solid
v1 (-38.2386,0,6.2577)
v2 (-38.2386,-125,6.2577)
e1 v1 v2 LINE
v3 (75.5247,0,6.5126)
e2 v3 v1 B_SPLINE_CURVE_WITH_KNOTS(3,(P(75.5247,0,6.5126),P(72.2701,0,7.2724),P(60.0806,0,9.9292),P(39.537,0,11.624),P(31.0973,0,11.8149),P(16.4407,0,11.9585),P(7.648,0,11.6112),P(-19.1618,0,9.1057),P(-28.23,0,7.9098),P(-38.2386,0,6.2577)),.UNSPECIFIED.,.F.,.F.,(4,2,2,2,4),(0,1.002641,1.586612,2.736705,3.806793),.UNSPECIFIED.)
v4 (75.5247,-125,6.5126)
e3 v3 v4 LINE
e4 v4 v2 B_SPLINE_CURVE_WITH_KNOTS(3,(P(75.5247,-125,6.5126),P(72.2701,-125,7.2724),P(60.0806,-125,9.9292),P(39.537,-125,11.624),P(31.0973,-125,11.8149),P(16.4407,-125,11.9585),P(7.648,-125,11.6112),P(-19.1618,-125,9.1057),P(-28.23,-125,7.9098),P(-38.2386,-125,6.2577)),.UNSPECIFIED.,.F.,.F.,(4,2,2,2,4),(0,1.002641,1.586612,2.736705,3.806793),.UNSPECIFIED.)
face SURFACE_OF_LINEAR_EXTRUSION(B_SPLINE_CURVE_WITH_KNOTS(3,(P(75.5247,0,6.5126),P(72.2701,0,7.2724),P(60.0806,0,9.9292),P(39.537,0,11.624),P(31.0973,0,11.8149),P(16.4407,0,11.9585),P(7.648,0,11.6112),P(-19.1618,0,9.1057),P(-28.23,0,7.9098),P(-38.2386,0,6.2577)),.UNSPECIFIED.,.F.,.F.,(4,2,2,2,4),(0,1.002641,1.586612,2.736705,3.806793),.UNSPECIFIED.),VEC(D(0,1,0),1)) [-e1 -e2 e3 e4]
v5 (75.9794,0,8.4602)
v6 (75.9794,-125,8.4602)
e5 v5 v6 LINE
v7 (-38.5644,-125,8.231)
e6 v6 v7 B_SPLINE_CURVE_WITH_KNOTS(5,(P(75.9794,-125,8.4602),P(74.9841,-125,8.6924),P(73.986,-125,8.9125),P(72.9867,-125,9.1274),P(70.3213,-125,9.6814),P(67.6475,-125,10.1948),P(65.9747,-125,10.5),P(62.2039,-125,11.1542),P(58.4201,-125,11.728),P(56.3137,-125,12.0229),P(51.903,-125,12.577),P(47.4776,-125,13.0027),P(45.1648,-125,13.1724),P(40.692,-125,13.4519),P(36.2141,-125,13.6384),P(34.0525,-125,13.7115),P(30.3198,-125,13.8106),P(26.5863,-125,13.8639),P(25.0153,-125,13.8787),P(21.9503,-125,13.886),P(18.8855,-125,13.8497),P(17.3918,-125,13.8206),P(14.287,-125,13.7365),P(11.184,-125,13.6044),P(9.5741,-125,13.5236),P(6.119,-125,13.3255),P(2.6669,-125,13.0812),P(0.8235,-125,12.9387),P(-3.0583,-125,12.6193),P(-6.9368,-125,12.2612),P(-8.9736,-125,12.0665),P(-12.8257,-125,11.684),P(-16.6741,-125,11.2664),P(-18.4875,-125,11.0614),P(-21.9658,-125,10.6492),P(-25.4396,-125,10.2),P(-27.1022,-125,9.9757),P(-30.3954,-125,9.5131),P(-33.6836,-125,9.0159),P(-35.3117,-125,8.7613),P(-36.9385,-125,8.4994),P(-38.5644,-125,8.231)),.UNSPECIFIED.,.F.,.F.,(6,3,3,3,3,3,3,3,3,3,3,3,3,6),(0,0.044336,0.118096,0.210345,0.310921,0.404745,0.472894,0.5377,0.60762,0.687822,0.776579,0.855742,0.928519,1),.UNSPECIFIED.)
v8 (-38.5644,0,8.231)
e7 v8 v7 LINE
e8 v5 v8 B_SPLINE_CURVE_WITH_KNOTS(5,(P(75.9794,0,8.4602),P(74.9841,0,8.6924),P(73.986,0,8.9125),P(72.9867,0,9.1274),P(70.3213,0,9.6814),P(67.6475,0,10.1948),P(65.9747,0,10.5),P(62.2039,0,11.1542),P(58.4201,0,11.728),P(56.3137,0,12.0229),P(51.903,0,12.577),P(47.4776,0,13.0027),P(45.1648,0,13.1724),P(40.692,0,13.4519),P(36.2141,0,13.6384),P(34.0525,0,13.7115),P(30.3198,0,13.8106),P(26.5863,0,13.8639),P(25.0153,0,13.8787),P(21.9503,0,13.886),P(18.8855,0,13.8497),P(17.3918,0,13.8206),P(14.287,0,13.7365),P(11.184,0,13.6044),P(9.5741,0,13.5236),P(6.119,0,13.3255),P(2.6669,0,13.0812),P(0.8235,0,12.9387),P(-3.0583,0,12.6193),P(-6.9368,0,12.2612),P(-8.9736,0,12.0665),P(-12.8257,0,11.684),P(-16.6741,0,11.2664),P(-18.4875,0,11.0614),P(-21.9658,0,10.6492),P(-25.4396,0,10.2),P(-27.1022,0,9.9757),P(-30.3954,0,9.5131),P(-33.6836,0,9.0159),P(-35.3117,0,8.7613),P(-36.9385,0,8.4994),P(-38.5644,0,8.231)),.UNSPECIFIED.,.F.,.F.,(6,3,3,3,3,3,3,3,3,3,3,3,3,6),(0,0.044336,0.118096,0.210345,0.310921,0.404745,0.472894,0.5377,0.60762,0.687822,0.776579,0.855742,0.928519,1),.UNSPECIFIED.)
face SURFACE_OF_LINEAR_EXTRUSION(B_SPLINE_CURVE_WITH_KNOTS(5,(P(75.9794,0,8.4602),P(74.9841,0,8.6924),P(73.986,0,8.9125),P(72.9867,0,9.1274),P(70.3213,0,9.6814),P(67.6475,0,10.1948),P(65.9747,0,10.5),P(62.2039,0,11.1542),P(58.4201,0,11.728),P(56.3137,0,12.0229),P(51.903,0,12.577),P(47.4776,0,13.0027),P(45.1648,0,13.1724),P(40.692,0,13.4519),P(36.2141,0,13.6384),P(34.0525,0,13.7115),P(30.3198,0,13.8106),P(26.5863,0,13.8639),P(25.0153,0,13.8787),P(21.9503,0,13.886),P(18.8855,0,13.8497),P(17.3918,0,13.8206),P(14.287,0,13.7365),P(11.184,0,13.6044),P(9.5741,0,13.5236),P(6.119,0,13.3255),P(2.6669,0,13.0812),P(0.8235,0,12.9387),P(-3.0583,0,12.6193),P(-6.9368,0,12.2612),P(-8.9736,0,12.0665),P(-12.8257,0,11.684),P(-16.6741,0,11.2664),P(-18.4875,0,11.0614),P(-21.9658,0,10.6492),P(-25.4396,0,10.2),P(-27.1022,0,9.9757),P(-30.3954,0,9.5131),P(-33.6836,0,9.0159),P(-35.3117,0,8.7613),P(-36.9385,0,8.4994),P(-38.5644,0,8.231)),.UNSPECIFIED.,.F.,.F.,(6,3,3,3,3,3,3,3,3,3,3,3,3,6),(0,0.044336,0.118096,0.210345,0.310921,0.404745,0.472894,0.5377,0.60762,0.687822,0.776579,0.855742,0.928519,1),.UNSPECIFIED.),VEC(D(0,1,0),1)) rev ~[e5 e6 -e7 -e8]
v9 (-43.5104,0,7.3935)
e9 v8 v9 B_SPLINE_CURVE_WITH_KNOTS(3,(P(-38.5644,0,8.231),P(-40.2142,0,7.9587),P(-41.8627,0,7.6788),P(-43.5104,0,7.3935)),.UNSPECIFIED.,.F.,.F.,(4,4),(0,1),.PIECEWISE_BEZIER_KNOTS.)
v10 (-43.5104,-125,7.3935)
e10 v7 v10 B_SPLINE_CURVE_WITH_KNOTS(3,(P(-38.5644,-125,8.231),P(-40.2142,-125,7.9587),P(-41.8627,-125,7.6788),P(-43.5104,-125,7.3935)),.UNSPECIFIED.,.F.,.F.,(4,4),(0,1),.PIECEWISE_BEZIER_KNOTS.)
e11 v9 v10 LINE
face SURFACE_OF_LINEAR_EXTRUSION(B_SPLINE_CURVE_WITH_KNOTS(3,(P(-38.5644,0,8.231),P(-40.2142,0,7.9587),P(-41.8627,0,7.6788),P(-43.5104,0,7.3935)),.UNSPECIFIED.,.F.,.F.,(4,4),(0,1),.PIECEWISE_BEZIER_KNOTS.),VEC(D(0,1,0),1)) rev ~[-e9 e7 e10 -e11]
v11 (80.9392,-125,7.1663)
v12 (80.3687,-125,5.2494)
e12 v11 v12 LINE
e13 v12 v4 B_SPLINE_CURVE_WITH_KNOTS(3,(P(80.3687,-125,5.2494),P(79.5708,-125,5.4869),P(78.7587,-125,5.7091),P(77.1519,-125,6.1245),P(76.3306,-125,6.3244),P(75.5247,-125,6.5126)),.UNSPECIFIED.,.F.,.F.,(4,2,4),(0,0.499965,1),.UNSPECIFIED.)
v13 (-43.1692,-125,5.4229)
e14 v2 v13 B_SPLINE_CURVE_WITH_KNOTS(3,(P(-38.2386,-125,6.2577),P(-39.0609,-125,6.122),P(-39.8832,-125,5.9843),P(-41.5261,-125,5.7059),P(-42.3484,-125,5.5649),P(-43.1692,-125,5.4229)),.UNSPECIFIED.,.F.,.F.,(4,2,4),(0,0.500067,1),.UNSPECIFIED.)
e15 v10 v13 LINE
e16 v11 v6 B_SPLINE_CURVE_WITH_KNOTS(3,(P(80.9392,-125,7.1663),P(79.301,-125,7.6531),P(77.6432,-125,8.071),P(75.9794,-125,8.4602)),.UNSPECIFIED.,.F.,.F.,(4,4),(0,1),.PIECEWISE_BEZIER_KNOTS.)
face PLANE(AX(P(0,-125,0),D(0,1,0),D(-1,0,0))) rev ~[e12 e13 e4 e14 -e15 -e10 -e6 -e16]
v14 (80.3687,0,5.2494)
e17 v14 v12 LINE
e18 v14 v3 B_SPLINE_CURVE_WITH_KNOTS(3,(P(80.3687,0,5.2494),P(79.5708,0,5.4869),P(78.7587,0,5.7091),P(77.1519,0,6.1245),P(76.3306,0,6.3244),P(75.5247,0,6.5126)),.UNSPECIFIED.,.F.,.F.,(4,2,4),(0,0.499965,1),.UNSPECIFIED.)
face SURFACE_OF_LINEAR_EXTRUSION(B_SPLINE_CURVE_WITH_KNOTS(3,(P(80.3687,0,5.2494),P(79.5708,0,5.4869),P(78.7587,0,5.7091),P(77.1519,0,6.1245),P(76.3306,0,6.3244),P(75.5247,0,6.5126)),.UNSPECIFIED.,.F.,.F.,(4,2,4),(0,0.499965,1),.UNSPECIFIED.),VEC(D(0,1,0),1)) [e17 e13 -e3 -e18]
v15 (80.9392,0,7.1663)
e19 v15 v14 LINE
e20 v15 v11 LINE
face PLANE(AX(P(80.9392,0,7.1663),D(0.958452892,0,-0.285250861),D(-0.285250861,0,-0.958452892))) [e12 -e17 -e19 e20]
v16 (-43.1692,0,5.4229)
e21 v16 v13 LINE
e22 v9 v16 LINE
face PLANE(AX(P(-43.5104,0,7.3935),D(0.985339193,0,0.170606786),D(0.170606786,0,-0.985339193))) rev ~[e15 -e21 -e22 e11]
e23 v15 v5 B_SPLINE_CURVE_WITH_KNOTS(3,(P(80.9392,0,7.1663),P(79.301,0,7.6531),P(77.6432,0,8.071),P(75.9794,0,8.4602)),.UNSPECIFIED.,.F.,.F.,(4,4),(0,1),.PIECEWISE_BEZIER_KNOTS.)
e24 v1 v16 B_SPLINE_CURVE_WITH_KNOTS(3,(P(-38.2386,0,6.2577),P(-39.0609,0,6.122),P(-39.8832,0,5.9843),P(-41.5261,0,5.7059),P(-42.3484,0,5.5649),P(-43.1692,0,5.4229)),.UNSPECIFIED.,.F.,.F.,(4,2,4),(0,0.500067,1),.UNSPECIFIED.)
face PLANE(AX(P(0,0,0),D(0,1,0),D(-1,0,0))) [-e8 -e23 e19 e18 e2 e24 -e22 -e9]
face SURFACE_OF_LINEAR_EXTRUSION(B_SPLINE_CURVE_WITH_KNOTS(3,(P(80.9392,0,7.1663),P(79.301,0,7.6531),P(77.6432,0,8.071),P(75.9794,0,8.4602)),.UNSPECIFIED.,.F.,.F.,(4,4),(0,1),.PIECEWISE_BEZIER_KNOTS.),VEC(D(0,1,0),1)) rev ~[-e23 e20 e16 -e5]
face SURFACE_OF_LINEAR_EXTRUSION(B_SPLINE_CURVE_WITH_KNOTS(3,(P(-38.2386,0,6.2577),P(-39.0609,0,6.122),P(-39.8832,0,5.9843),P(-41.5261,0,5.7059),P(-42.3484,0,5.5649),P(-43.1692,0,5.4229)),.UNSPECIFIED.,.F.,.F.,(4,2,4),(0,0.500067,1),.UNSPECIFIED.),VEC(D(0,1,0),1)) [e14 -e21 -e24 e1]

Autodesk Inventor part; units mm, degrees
ref_plane "YZ Plane" through (0, 0, 0) normal (1, 0, 0) x (0, 1, 0)
ref_plane "XZ Plane" through (0, 0, 0) normal (0, 1, 0) x (-1, 0, 0)
ref_plane "XY Plane" through (0, 0, 0) normal (0, 0, 1) x (1, 0, 0)
sketch "Sketch1" plane through (0, 0, 0) normal (0, 1, 0) x (-1, 0, 0)
  spline S0 degree 3 poles (43.1522, 5.3243) (42.3315, 5.4664) (41.5093, 5.6073) (39.8666, 5.8857) (39.0444, 6.0233) (38.2223, 6.159) knots 0 0 0 0 0.499933 0.499933 1 1 1 1
  spline S1 degree 3 poles (66.2259, 1.043) (62.6029, 1.7785) (58.6834, 2.5166) (51.798, 3.7917) (47.2188, 4.6203) (43.1522, 5.3243) knots 0 0 0 0 1.10907 1.10907 2.509245 2.509245 2.509245 2.509245
  spline S2 degree 3 poles (71.1391, 0.018) (70.321, 0.1929) (69.5028, 0.3659) (67.8628, 0.7083) (67.0477, 0.8762) (66.2259, 1.043) knots 0 0 0 0 0.250983 0.250983 0.502621 0.502621 0.502621 0.502621
  spline S3 degree 3 poles (100.0196, -7.1406) (100.0208, -7.1354) (100.0209, -7.13) (100.019, -7.1179) (100.0165, -7.1114) (100.0075, -7.0943) (99.9988, -7.0838) (99.9675, -7.0518) (99.9354, -7.0292) (99.7974, -6.9442) (99.6273, -6.8698) (98.578, -6.4707) (96.8058, -5.9602) (87.4188, -3.5895) (77.8842, -1.4241) (71.1391, 0.018) knots 0 0 0 0 0.003623 0.003623 0.008208 0.008208 0.01664 0.01664 0.03832 0.03832 0.1102 0.1102 0.407101 0.407101 1 1 1 1
  spline S4 degree 3 poles (88.3221, -6.0834) (91.7402, -6.4934) (94.4085, -6.8236) (97.4322, -7.1281) (98.4156, -7.2175) (99.3319, -7.2475) (99.5896, -7.2498) (99.8412, -7.2231) (99.9048, -7.2123) (99.9684, -7.1892) (99.9857, -7.1811) (100.0039, -7.1666) (100.0088, -7.1618) (100.0159, -7.1515) (100.0184, -7.1463) (100.0196, -7.1406) knots 0 0 0 0 1.032775 1.032775 1.426182 1.426182 1.558102 1.558102 1.606872 1.606872 1.625804 1.625804 1.633391 1.633391 1.640028 1.640028 1.640028 1.640028
  spline S5 degree 3 poles (83.37, -5.5037) (84.1975, -5.5971) (85.0257, -5.6928) (86.6772, -5.8867) (87.4943, -5.9841) (88.3221, -6.0834) knots 0 0 0 0 0.501042 0.501042 1 1 1 1
  spline S6 degree 3 poles (-80.3402, 5.1536) (-83.2822, 4.278) (-86.9469, 2.7724) (-90.9829, 1.0041) (-94.5535, -0.8137) (-97.494, -3.1687) (-98.2105, -3.8005) (-99.1921, -4.921) (-99.5356, -5.4063) (-99.8868, -6.2147) (-99.9775, -6.5471) (-99.996, -7.1728) (-99.9491, -7.4459) (-99.7408, -7.9881) (-99.5798, -8.2401) (-99.0999, -8.8123) (-98.7333, -9.1116) (-97.8214, -9.7276) (-97.0693, -10.1264) (-95.5344, -10.6309) (-94.6795, -10.8081) (-86.0276, -11.9257) (-83.5865, -11.7916) (-79.0114, -11.6226) (-70.8952, -11.1542) (-60.4886, -10.5087) (-55.0368, -10.1095) (-44.8902, -9.0581) (-36.6849, -8.1844) (-26.6949, -7.2523) (-13.6037, -6.0273) (1.2561, -4.8792) (6.6493, -4.6998) (30.6513, -3.7055) (33.9966, -3.3748) (56.1985, -4.0849) (56.7678, -4.1014) (69.2783, -4.2473) (73.4546, -4.385) (83.37, -5.5037) knots 0 0 0 0 0.920867 0.920867 2.748385 2.748385 3.274223 3.274223 3.647653 3.647653 3.885224 3.885224 4.081385 4.081385 4.287479 4.287479 4.599167 4.599167 5.052723 5.052723 5.427905 5.427905 6.514514 6.514514 8.824105 8.824105 12.215959 12.215959 13.039612 13.039612 13.387005 13.387005 13.841738 13.841738 14.651769 14.651769 15.011097 15.011097 15.310395 15.310395 15.310395 15.310395
  spline S7 degree 3 poles (-75.502, 6.4152) (-76.3067, 6.2273) (-77.1275, 6.0275) (-78.7331, 5.6124) (-79.5438, 5.3906) (-80.3402, 5.1536) knots 0 0 0 0 0.500004 0.500004 1 1 1 1
  spline S8 degree 3 poles (38.2223, 6.159) (27.9475, 7.8551) (19.1532, 8.9329) (-7.8876, 11.6415) (-18.2273, 12.0298) (-42.3592, 11.3757) (-48.6068, 10.8186) (-61.3144, 9.3487) (-69.9295, 7.7161) (-75.502, 6.4152) knots 0 0 0 0 3.124155 3.124155 9.518563 9.518563 14.091564 14.091564 23.667143 23.667143 23.667143 23.667143
  spline S9 degree 3 poles (71.16, 0.1157) (76.6898, -1.0665) (83.3896, -2.5841) (91.1027, -4.4231) (94.4588, -5.2395) (97.5341, -6.0864) (98.563, -6.3783) (99.4741, -6.7017) (99.714, -6.7939) (99.9439, -6.915) (100.0045, -6.9522) (100.0735, -7.0152) (100.0907, -7.0376) (100.1097, -7.0737) (100.1154, -7.0895) (100.1227, -7.1305) (100.12, -7.1501) (100.1172, -7.1624) knots 0 0 0 0 1.696424 1.696424 2.44904 2.44904 2.662496 2.662496 2.730748 2.730748 2.757666 2.757666 2.774085 2.774085 2.785515 2.785515 2.802376 2.802376 2.802376 2.802376
  spline S10 degree 3 poles (66.2458, 1.141) (67.0677, 0.9742) (67.8829, 0.8063) (69.5234, 0.4638) (70.3418, 0.2907) (71.16, 0.1157) knots 0 0 0 0 0.251575 0.251575 0.502459 0.502459 0.502459 0.502459
  spline S11 degree 3 poles (43.1692, 5.4229) (47.2367, 4.7187) (51.8267, 3.8881) (58.6927, 2.6166) (62.6216, 1.8767) (66.2458, 1.141) knots 0 0 0 0 1.23838 1.23838 2.219097 2.219097 2.219097 2.219097
  spline S12 degree 3 poles (38.2386, 6.2577) (39.0609, 6.122) (39.8832, 5.9843) (41.5261, 5.7059) (42.3484, 5.5649) (43.1692, 5.4229) knots 0 0 0 0 0.500067 0.500067 1 1 1 1
  spline S13 degree 3 poles (-75.5247, 6.5126) (-72.2701, 7.2724) (-60.0806, 9.9292) (-39.537, 11.624) (-31.0973, 11.8149) (-16.4407, 11.9585) (-7.648, 11.6112) (19.1618, 9.1057) (28.23, 7.9098) (38.2386, 6.2577) knots 0 0 0 0 1.002641 1.002641 1.586612 1.586612 2.736705 2.736705 3.806793 3.806793 3.806793 3.806793
  spline S14 degree 3 poles (-80.3687, 5.2494) (-79.5708, 5.4869) (-78.7587, 5.7091) (-77.1519, 6.1245) (-76.3306, 6.3244) (-75.5247, 6.5126) knots 0 0 0 0 0.499965 0.499965 1 1 1 1
  spline S15 degree 3 poles (83.3587, -5.6031) (75.8338, -4.7541) (71.2171, -4.423) (63.0763, -4.2593) (60.5743, -4.3016) (45.89, -3.876) (40.1735, -3.5496) (26.2872, -3.9476) (23.855, -4.0783) (5.7068, -4.8523) (1.6068, -4.9189) (-14.9038, -6.2524) (-28.7569, -7.5451) (-40.8533, -8.6747) (-44.9578, -9.1707) (-57.2636, -10.422) (-64.8382, -10.9037) (-83.9685, -11.9819) (-84.6152, -11.9986) (-90.0569, -11.4994) (-92.1017, -11.255) (-95.0997, -10.8278) (-95.9036, -10.6544) (-97.3262, -10.0915) (-97.9449, -9.7713) (-98.8418, -9.1537) (-99.205, -8.8504) (-99.7077, -8.2367) (-99.8828, -7.9431) (-100.0757, -7.3344) (-100.1057, -7.0447) (-100.0507, -6.4271) (-99.9566, -6.1154) (-99.6173, -5.3587) (-99.3082, -4.9211) (-98.3779, -3.8124) (-97.5855, -3.1068) (-94.7697, -0.8788) (-91.4921, 0.8379) (-88.0288, 2.4212) (-83.9774, 4.1755) (-80.3687, 5.2494) knots 0 0 0 0 2.271794 2.271794 3.492265 3.492265 4.943094 4.943094 5.554122 5.554122 6.779206 6.779206 7.500678 7.500678 15.370973 15.370973 37.081903 37.081903 69.577181 69.577181 84.528966 84.528966 99.973288 99.973288 111.121624 111.121624 119.002016 119.002016 124.961046 124.961046 130.137791 130.137791 135.773633 135.773633 144.620011 144.620011 161.147321 161.147321 203.473601 203.473601 223.476886 223.476886 223.476886 223.476886
  spline S16 degree 3 poles (88.3102, -6.1827) (87.4831, -6.0835) (86.6655, -5.9861) (85.0141, -5.7922) (84.1861, -5.6964) (83.3587, -5.6031) knots 0 0 0 0 0.249891 0.249891 0.500826 0.500826 0.500826 0.500826
  spline S17 degree 3 poles (100.1172, -7.1624) (100.1146, -7.1743) (100.1092, -7.1916) (100.0867, -7.2256) (100.074, -7.2388) (100.0392, -7.266) (100.0166, -7.2771) (99.9548, -7.302) (99.9026, -7.3136) (99.663, -7.3489) (99.3874, -7.3493) (97.3054, -7.2818) (93.1035, -6.7576) (88.3102, -6.1827) knots 0 0 0 0 0.015283 0.015283 0.027652 0.027652 0.045345 0.045345 0.084745 0.084745 0.209887 0.209887 1 1 1 1
  line L0 (-80.9392, 7.1663) -> (-80.3687, 5.2494)
  line L1 (43.5104, 7.3935) -> (43.1692, 5.4229)
  circle A0 centre (-92.98, -6.2739) radius 1.75
  circle A1 centre (49.02, 0.2394) radius 1.75
  spline S18 degree 3 poles (-80.9392, 7.1663) (-79.301, 7.6531) (-77.6432, 8.071) (-75.9794, 8.4602) knots 0 0 0 0 1 1 1 1
  spline S19 degree 5 poles (-75.9794, 8.4602) (-74.9841, 8.6924) (-73.986, 8.9125) (-72.9867, 9.1274) (-70.3213, 9.6814) (-67.6475, 10.1948) (-65.9747, 10.5) (-62.2039, 11.1542) (-58.4201, 11.728) (-56.3137, 12.0229) (-51.903, 12.577) (-47.4776, 13.0027) (-45.1648, 13.1724) (-40.692, 13.4519) (-36.2141, 13.6384) (-34.0525, 13.7115) (-30.3198, 13.8106) (-26.5863, 13.8639) (-25.0153, 13.8787) (-21.9503, 13.886) (-18.8855, 13.8497) (-17.3918, 13.8206) (-14.287, 13.7365) (-11.184, 13.6044) (-9.5741, 13.5236) (-6.119, 13.3255) (-2.6669, 13.0812) (-0.8235, 12.9387) (3.0583, 12.6193) (6.9368, 12.2612) (8.9736, 12.0665) (12.8257, 11.684) (16.6741, 11.2664) (18.4875, 11.0614) (21.9658, 10.6492) (25.4396, 10.2) (27.1022, 9.9757) (30.3954, 9.5131) (33.6836, 9.0159) (35.3117, 8.7613) (36.9385, 8.4994) (38.5644, 8.231) knots 0 0 0 0 0 0 0.044336 0.044336 0.044336 0.118096 0.118096 0.118096 0.210345 0.210345 0.210345 0.310921 0.310921 0.310921 0.404745 0.404745 0.404745 0.472894 0.472894 0.472894 0.5377 0.5377 0.5377 0.60762 0.60762 0.60762 0.687822 0.687822 0.687822 0.776579 0.776579 0.776579 0.855742 0.855742 0.855742 0.928519 0.928519 0.928519 1 1 1 1 1 1
  spline S20 degree 3 poles (38.5644, 8.231) (40.2142, 7.9587) (41.8627, 7.6788) (43.5104, 7.3935) knots 0 0 0 0 1 1 1 1
  point P0 (0, 0)
extrude "Extrusion1" add sketch "Sketch1" against normal blind 125 contours S12 S13 S14 L0 S18 S19 S20 L1
properties part number "Panele"
